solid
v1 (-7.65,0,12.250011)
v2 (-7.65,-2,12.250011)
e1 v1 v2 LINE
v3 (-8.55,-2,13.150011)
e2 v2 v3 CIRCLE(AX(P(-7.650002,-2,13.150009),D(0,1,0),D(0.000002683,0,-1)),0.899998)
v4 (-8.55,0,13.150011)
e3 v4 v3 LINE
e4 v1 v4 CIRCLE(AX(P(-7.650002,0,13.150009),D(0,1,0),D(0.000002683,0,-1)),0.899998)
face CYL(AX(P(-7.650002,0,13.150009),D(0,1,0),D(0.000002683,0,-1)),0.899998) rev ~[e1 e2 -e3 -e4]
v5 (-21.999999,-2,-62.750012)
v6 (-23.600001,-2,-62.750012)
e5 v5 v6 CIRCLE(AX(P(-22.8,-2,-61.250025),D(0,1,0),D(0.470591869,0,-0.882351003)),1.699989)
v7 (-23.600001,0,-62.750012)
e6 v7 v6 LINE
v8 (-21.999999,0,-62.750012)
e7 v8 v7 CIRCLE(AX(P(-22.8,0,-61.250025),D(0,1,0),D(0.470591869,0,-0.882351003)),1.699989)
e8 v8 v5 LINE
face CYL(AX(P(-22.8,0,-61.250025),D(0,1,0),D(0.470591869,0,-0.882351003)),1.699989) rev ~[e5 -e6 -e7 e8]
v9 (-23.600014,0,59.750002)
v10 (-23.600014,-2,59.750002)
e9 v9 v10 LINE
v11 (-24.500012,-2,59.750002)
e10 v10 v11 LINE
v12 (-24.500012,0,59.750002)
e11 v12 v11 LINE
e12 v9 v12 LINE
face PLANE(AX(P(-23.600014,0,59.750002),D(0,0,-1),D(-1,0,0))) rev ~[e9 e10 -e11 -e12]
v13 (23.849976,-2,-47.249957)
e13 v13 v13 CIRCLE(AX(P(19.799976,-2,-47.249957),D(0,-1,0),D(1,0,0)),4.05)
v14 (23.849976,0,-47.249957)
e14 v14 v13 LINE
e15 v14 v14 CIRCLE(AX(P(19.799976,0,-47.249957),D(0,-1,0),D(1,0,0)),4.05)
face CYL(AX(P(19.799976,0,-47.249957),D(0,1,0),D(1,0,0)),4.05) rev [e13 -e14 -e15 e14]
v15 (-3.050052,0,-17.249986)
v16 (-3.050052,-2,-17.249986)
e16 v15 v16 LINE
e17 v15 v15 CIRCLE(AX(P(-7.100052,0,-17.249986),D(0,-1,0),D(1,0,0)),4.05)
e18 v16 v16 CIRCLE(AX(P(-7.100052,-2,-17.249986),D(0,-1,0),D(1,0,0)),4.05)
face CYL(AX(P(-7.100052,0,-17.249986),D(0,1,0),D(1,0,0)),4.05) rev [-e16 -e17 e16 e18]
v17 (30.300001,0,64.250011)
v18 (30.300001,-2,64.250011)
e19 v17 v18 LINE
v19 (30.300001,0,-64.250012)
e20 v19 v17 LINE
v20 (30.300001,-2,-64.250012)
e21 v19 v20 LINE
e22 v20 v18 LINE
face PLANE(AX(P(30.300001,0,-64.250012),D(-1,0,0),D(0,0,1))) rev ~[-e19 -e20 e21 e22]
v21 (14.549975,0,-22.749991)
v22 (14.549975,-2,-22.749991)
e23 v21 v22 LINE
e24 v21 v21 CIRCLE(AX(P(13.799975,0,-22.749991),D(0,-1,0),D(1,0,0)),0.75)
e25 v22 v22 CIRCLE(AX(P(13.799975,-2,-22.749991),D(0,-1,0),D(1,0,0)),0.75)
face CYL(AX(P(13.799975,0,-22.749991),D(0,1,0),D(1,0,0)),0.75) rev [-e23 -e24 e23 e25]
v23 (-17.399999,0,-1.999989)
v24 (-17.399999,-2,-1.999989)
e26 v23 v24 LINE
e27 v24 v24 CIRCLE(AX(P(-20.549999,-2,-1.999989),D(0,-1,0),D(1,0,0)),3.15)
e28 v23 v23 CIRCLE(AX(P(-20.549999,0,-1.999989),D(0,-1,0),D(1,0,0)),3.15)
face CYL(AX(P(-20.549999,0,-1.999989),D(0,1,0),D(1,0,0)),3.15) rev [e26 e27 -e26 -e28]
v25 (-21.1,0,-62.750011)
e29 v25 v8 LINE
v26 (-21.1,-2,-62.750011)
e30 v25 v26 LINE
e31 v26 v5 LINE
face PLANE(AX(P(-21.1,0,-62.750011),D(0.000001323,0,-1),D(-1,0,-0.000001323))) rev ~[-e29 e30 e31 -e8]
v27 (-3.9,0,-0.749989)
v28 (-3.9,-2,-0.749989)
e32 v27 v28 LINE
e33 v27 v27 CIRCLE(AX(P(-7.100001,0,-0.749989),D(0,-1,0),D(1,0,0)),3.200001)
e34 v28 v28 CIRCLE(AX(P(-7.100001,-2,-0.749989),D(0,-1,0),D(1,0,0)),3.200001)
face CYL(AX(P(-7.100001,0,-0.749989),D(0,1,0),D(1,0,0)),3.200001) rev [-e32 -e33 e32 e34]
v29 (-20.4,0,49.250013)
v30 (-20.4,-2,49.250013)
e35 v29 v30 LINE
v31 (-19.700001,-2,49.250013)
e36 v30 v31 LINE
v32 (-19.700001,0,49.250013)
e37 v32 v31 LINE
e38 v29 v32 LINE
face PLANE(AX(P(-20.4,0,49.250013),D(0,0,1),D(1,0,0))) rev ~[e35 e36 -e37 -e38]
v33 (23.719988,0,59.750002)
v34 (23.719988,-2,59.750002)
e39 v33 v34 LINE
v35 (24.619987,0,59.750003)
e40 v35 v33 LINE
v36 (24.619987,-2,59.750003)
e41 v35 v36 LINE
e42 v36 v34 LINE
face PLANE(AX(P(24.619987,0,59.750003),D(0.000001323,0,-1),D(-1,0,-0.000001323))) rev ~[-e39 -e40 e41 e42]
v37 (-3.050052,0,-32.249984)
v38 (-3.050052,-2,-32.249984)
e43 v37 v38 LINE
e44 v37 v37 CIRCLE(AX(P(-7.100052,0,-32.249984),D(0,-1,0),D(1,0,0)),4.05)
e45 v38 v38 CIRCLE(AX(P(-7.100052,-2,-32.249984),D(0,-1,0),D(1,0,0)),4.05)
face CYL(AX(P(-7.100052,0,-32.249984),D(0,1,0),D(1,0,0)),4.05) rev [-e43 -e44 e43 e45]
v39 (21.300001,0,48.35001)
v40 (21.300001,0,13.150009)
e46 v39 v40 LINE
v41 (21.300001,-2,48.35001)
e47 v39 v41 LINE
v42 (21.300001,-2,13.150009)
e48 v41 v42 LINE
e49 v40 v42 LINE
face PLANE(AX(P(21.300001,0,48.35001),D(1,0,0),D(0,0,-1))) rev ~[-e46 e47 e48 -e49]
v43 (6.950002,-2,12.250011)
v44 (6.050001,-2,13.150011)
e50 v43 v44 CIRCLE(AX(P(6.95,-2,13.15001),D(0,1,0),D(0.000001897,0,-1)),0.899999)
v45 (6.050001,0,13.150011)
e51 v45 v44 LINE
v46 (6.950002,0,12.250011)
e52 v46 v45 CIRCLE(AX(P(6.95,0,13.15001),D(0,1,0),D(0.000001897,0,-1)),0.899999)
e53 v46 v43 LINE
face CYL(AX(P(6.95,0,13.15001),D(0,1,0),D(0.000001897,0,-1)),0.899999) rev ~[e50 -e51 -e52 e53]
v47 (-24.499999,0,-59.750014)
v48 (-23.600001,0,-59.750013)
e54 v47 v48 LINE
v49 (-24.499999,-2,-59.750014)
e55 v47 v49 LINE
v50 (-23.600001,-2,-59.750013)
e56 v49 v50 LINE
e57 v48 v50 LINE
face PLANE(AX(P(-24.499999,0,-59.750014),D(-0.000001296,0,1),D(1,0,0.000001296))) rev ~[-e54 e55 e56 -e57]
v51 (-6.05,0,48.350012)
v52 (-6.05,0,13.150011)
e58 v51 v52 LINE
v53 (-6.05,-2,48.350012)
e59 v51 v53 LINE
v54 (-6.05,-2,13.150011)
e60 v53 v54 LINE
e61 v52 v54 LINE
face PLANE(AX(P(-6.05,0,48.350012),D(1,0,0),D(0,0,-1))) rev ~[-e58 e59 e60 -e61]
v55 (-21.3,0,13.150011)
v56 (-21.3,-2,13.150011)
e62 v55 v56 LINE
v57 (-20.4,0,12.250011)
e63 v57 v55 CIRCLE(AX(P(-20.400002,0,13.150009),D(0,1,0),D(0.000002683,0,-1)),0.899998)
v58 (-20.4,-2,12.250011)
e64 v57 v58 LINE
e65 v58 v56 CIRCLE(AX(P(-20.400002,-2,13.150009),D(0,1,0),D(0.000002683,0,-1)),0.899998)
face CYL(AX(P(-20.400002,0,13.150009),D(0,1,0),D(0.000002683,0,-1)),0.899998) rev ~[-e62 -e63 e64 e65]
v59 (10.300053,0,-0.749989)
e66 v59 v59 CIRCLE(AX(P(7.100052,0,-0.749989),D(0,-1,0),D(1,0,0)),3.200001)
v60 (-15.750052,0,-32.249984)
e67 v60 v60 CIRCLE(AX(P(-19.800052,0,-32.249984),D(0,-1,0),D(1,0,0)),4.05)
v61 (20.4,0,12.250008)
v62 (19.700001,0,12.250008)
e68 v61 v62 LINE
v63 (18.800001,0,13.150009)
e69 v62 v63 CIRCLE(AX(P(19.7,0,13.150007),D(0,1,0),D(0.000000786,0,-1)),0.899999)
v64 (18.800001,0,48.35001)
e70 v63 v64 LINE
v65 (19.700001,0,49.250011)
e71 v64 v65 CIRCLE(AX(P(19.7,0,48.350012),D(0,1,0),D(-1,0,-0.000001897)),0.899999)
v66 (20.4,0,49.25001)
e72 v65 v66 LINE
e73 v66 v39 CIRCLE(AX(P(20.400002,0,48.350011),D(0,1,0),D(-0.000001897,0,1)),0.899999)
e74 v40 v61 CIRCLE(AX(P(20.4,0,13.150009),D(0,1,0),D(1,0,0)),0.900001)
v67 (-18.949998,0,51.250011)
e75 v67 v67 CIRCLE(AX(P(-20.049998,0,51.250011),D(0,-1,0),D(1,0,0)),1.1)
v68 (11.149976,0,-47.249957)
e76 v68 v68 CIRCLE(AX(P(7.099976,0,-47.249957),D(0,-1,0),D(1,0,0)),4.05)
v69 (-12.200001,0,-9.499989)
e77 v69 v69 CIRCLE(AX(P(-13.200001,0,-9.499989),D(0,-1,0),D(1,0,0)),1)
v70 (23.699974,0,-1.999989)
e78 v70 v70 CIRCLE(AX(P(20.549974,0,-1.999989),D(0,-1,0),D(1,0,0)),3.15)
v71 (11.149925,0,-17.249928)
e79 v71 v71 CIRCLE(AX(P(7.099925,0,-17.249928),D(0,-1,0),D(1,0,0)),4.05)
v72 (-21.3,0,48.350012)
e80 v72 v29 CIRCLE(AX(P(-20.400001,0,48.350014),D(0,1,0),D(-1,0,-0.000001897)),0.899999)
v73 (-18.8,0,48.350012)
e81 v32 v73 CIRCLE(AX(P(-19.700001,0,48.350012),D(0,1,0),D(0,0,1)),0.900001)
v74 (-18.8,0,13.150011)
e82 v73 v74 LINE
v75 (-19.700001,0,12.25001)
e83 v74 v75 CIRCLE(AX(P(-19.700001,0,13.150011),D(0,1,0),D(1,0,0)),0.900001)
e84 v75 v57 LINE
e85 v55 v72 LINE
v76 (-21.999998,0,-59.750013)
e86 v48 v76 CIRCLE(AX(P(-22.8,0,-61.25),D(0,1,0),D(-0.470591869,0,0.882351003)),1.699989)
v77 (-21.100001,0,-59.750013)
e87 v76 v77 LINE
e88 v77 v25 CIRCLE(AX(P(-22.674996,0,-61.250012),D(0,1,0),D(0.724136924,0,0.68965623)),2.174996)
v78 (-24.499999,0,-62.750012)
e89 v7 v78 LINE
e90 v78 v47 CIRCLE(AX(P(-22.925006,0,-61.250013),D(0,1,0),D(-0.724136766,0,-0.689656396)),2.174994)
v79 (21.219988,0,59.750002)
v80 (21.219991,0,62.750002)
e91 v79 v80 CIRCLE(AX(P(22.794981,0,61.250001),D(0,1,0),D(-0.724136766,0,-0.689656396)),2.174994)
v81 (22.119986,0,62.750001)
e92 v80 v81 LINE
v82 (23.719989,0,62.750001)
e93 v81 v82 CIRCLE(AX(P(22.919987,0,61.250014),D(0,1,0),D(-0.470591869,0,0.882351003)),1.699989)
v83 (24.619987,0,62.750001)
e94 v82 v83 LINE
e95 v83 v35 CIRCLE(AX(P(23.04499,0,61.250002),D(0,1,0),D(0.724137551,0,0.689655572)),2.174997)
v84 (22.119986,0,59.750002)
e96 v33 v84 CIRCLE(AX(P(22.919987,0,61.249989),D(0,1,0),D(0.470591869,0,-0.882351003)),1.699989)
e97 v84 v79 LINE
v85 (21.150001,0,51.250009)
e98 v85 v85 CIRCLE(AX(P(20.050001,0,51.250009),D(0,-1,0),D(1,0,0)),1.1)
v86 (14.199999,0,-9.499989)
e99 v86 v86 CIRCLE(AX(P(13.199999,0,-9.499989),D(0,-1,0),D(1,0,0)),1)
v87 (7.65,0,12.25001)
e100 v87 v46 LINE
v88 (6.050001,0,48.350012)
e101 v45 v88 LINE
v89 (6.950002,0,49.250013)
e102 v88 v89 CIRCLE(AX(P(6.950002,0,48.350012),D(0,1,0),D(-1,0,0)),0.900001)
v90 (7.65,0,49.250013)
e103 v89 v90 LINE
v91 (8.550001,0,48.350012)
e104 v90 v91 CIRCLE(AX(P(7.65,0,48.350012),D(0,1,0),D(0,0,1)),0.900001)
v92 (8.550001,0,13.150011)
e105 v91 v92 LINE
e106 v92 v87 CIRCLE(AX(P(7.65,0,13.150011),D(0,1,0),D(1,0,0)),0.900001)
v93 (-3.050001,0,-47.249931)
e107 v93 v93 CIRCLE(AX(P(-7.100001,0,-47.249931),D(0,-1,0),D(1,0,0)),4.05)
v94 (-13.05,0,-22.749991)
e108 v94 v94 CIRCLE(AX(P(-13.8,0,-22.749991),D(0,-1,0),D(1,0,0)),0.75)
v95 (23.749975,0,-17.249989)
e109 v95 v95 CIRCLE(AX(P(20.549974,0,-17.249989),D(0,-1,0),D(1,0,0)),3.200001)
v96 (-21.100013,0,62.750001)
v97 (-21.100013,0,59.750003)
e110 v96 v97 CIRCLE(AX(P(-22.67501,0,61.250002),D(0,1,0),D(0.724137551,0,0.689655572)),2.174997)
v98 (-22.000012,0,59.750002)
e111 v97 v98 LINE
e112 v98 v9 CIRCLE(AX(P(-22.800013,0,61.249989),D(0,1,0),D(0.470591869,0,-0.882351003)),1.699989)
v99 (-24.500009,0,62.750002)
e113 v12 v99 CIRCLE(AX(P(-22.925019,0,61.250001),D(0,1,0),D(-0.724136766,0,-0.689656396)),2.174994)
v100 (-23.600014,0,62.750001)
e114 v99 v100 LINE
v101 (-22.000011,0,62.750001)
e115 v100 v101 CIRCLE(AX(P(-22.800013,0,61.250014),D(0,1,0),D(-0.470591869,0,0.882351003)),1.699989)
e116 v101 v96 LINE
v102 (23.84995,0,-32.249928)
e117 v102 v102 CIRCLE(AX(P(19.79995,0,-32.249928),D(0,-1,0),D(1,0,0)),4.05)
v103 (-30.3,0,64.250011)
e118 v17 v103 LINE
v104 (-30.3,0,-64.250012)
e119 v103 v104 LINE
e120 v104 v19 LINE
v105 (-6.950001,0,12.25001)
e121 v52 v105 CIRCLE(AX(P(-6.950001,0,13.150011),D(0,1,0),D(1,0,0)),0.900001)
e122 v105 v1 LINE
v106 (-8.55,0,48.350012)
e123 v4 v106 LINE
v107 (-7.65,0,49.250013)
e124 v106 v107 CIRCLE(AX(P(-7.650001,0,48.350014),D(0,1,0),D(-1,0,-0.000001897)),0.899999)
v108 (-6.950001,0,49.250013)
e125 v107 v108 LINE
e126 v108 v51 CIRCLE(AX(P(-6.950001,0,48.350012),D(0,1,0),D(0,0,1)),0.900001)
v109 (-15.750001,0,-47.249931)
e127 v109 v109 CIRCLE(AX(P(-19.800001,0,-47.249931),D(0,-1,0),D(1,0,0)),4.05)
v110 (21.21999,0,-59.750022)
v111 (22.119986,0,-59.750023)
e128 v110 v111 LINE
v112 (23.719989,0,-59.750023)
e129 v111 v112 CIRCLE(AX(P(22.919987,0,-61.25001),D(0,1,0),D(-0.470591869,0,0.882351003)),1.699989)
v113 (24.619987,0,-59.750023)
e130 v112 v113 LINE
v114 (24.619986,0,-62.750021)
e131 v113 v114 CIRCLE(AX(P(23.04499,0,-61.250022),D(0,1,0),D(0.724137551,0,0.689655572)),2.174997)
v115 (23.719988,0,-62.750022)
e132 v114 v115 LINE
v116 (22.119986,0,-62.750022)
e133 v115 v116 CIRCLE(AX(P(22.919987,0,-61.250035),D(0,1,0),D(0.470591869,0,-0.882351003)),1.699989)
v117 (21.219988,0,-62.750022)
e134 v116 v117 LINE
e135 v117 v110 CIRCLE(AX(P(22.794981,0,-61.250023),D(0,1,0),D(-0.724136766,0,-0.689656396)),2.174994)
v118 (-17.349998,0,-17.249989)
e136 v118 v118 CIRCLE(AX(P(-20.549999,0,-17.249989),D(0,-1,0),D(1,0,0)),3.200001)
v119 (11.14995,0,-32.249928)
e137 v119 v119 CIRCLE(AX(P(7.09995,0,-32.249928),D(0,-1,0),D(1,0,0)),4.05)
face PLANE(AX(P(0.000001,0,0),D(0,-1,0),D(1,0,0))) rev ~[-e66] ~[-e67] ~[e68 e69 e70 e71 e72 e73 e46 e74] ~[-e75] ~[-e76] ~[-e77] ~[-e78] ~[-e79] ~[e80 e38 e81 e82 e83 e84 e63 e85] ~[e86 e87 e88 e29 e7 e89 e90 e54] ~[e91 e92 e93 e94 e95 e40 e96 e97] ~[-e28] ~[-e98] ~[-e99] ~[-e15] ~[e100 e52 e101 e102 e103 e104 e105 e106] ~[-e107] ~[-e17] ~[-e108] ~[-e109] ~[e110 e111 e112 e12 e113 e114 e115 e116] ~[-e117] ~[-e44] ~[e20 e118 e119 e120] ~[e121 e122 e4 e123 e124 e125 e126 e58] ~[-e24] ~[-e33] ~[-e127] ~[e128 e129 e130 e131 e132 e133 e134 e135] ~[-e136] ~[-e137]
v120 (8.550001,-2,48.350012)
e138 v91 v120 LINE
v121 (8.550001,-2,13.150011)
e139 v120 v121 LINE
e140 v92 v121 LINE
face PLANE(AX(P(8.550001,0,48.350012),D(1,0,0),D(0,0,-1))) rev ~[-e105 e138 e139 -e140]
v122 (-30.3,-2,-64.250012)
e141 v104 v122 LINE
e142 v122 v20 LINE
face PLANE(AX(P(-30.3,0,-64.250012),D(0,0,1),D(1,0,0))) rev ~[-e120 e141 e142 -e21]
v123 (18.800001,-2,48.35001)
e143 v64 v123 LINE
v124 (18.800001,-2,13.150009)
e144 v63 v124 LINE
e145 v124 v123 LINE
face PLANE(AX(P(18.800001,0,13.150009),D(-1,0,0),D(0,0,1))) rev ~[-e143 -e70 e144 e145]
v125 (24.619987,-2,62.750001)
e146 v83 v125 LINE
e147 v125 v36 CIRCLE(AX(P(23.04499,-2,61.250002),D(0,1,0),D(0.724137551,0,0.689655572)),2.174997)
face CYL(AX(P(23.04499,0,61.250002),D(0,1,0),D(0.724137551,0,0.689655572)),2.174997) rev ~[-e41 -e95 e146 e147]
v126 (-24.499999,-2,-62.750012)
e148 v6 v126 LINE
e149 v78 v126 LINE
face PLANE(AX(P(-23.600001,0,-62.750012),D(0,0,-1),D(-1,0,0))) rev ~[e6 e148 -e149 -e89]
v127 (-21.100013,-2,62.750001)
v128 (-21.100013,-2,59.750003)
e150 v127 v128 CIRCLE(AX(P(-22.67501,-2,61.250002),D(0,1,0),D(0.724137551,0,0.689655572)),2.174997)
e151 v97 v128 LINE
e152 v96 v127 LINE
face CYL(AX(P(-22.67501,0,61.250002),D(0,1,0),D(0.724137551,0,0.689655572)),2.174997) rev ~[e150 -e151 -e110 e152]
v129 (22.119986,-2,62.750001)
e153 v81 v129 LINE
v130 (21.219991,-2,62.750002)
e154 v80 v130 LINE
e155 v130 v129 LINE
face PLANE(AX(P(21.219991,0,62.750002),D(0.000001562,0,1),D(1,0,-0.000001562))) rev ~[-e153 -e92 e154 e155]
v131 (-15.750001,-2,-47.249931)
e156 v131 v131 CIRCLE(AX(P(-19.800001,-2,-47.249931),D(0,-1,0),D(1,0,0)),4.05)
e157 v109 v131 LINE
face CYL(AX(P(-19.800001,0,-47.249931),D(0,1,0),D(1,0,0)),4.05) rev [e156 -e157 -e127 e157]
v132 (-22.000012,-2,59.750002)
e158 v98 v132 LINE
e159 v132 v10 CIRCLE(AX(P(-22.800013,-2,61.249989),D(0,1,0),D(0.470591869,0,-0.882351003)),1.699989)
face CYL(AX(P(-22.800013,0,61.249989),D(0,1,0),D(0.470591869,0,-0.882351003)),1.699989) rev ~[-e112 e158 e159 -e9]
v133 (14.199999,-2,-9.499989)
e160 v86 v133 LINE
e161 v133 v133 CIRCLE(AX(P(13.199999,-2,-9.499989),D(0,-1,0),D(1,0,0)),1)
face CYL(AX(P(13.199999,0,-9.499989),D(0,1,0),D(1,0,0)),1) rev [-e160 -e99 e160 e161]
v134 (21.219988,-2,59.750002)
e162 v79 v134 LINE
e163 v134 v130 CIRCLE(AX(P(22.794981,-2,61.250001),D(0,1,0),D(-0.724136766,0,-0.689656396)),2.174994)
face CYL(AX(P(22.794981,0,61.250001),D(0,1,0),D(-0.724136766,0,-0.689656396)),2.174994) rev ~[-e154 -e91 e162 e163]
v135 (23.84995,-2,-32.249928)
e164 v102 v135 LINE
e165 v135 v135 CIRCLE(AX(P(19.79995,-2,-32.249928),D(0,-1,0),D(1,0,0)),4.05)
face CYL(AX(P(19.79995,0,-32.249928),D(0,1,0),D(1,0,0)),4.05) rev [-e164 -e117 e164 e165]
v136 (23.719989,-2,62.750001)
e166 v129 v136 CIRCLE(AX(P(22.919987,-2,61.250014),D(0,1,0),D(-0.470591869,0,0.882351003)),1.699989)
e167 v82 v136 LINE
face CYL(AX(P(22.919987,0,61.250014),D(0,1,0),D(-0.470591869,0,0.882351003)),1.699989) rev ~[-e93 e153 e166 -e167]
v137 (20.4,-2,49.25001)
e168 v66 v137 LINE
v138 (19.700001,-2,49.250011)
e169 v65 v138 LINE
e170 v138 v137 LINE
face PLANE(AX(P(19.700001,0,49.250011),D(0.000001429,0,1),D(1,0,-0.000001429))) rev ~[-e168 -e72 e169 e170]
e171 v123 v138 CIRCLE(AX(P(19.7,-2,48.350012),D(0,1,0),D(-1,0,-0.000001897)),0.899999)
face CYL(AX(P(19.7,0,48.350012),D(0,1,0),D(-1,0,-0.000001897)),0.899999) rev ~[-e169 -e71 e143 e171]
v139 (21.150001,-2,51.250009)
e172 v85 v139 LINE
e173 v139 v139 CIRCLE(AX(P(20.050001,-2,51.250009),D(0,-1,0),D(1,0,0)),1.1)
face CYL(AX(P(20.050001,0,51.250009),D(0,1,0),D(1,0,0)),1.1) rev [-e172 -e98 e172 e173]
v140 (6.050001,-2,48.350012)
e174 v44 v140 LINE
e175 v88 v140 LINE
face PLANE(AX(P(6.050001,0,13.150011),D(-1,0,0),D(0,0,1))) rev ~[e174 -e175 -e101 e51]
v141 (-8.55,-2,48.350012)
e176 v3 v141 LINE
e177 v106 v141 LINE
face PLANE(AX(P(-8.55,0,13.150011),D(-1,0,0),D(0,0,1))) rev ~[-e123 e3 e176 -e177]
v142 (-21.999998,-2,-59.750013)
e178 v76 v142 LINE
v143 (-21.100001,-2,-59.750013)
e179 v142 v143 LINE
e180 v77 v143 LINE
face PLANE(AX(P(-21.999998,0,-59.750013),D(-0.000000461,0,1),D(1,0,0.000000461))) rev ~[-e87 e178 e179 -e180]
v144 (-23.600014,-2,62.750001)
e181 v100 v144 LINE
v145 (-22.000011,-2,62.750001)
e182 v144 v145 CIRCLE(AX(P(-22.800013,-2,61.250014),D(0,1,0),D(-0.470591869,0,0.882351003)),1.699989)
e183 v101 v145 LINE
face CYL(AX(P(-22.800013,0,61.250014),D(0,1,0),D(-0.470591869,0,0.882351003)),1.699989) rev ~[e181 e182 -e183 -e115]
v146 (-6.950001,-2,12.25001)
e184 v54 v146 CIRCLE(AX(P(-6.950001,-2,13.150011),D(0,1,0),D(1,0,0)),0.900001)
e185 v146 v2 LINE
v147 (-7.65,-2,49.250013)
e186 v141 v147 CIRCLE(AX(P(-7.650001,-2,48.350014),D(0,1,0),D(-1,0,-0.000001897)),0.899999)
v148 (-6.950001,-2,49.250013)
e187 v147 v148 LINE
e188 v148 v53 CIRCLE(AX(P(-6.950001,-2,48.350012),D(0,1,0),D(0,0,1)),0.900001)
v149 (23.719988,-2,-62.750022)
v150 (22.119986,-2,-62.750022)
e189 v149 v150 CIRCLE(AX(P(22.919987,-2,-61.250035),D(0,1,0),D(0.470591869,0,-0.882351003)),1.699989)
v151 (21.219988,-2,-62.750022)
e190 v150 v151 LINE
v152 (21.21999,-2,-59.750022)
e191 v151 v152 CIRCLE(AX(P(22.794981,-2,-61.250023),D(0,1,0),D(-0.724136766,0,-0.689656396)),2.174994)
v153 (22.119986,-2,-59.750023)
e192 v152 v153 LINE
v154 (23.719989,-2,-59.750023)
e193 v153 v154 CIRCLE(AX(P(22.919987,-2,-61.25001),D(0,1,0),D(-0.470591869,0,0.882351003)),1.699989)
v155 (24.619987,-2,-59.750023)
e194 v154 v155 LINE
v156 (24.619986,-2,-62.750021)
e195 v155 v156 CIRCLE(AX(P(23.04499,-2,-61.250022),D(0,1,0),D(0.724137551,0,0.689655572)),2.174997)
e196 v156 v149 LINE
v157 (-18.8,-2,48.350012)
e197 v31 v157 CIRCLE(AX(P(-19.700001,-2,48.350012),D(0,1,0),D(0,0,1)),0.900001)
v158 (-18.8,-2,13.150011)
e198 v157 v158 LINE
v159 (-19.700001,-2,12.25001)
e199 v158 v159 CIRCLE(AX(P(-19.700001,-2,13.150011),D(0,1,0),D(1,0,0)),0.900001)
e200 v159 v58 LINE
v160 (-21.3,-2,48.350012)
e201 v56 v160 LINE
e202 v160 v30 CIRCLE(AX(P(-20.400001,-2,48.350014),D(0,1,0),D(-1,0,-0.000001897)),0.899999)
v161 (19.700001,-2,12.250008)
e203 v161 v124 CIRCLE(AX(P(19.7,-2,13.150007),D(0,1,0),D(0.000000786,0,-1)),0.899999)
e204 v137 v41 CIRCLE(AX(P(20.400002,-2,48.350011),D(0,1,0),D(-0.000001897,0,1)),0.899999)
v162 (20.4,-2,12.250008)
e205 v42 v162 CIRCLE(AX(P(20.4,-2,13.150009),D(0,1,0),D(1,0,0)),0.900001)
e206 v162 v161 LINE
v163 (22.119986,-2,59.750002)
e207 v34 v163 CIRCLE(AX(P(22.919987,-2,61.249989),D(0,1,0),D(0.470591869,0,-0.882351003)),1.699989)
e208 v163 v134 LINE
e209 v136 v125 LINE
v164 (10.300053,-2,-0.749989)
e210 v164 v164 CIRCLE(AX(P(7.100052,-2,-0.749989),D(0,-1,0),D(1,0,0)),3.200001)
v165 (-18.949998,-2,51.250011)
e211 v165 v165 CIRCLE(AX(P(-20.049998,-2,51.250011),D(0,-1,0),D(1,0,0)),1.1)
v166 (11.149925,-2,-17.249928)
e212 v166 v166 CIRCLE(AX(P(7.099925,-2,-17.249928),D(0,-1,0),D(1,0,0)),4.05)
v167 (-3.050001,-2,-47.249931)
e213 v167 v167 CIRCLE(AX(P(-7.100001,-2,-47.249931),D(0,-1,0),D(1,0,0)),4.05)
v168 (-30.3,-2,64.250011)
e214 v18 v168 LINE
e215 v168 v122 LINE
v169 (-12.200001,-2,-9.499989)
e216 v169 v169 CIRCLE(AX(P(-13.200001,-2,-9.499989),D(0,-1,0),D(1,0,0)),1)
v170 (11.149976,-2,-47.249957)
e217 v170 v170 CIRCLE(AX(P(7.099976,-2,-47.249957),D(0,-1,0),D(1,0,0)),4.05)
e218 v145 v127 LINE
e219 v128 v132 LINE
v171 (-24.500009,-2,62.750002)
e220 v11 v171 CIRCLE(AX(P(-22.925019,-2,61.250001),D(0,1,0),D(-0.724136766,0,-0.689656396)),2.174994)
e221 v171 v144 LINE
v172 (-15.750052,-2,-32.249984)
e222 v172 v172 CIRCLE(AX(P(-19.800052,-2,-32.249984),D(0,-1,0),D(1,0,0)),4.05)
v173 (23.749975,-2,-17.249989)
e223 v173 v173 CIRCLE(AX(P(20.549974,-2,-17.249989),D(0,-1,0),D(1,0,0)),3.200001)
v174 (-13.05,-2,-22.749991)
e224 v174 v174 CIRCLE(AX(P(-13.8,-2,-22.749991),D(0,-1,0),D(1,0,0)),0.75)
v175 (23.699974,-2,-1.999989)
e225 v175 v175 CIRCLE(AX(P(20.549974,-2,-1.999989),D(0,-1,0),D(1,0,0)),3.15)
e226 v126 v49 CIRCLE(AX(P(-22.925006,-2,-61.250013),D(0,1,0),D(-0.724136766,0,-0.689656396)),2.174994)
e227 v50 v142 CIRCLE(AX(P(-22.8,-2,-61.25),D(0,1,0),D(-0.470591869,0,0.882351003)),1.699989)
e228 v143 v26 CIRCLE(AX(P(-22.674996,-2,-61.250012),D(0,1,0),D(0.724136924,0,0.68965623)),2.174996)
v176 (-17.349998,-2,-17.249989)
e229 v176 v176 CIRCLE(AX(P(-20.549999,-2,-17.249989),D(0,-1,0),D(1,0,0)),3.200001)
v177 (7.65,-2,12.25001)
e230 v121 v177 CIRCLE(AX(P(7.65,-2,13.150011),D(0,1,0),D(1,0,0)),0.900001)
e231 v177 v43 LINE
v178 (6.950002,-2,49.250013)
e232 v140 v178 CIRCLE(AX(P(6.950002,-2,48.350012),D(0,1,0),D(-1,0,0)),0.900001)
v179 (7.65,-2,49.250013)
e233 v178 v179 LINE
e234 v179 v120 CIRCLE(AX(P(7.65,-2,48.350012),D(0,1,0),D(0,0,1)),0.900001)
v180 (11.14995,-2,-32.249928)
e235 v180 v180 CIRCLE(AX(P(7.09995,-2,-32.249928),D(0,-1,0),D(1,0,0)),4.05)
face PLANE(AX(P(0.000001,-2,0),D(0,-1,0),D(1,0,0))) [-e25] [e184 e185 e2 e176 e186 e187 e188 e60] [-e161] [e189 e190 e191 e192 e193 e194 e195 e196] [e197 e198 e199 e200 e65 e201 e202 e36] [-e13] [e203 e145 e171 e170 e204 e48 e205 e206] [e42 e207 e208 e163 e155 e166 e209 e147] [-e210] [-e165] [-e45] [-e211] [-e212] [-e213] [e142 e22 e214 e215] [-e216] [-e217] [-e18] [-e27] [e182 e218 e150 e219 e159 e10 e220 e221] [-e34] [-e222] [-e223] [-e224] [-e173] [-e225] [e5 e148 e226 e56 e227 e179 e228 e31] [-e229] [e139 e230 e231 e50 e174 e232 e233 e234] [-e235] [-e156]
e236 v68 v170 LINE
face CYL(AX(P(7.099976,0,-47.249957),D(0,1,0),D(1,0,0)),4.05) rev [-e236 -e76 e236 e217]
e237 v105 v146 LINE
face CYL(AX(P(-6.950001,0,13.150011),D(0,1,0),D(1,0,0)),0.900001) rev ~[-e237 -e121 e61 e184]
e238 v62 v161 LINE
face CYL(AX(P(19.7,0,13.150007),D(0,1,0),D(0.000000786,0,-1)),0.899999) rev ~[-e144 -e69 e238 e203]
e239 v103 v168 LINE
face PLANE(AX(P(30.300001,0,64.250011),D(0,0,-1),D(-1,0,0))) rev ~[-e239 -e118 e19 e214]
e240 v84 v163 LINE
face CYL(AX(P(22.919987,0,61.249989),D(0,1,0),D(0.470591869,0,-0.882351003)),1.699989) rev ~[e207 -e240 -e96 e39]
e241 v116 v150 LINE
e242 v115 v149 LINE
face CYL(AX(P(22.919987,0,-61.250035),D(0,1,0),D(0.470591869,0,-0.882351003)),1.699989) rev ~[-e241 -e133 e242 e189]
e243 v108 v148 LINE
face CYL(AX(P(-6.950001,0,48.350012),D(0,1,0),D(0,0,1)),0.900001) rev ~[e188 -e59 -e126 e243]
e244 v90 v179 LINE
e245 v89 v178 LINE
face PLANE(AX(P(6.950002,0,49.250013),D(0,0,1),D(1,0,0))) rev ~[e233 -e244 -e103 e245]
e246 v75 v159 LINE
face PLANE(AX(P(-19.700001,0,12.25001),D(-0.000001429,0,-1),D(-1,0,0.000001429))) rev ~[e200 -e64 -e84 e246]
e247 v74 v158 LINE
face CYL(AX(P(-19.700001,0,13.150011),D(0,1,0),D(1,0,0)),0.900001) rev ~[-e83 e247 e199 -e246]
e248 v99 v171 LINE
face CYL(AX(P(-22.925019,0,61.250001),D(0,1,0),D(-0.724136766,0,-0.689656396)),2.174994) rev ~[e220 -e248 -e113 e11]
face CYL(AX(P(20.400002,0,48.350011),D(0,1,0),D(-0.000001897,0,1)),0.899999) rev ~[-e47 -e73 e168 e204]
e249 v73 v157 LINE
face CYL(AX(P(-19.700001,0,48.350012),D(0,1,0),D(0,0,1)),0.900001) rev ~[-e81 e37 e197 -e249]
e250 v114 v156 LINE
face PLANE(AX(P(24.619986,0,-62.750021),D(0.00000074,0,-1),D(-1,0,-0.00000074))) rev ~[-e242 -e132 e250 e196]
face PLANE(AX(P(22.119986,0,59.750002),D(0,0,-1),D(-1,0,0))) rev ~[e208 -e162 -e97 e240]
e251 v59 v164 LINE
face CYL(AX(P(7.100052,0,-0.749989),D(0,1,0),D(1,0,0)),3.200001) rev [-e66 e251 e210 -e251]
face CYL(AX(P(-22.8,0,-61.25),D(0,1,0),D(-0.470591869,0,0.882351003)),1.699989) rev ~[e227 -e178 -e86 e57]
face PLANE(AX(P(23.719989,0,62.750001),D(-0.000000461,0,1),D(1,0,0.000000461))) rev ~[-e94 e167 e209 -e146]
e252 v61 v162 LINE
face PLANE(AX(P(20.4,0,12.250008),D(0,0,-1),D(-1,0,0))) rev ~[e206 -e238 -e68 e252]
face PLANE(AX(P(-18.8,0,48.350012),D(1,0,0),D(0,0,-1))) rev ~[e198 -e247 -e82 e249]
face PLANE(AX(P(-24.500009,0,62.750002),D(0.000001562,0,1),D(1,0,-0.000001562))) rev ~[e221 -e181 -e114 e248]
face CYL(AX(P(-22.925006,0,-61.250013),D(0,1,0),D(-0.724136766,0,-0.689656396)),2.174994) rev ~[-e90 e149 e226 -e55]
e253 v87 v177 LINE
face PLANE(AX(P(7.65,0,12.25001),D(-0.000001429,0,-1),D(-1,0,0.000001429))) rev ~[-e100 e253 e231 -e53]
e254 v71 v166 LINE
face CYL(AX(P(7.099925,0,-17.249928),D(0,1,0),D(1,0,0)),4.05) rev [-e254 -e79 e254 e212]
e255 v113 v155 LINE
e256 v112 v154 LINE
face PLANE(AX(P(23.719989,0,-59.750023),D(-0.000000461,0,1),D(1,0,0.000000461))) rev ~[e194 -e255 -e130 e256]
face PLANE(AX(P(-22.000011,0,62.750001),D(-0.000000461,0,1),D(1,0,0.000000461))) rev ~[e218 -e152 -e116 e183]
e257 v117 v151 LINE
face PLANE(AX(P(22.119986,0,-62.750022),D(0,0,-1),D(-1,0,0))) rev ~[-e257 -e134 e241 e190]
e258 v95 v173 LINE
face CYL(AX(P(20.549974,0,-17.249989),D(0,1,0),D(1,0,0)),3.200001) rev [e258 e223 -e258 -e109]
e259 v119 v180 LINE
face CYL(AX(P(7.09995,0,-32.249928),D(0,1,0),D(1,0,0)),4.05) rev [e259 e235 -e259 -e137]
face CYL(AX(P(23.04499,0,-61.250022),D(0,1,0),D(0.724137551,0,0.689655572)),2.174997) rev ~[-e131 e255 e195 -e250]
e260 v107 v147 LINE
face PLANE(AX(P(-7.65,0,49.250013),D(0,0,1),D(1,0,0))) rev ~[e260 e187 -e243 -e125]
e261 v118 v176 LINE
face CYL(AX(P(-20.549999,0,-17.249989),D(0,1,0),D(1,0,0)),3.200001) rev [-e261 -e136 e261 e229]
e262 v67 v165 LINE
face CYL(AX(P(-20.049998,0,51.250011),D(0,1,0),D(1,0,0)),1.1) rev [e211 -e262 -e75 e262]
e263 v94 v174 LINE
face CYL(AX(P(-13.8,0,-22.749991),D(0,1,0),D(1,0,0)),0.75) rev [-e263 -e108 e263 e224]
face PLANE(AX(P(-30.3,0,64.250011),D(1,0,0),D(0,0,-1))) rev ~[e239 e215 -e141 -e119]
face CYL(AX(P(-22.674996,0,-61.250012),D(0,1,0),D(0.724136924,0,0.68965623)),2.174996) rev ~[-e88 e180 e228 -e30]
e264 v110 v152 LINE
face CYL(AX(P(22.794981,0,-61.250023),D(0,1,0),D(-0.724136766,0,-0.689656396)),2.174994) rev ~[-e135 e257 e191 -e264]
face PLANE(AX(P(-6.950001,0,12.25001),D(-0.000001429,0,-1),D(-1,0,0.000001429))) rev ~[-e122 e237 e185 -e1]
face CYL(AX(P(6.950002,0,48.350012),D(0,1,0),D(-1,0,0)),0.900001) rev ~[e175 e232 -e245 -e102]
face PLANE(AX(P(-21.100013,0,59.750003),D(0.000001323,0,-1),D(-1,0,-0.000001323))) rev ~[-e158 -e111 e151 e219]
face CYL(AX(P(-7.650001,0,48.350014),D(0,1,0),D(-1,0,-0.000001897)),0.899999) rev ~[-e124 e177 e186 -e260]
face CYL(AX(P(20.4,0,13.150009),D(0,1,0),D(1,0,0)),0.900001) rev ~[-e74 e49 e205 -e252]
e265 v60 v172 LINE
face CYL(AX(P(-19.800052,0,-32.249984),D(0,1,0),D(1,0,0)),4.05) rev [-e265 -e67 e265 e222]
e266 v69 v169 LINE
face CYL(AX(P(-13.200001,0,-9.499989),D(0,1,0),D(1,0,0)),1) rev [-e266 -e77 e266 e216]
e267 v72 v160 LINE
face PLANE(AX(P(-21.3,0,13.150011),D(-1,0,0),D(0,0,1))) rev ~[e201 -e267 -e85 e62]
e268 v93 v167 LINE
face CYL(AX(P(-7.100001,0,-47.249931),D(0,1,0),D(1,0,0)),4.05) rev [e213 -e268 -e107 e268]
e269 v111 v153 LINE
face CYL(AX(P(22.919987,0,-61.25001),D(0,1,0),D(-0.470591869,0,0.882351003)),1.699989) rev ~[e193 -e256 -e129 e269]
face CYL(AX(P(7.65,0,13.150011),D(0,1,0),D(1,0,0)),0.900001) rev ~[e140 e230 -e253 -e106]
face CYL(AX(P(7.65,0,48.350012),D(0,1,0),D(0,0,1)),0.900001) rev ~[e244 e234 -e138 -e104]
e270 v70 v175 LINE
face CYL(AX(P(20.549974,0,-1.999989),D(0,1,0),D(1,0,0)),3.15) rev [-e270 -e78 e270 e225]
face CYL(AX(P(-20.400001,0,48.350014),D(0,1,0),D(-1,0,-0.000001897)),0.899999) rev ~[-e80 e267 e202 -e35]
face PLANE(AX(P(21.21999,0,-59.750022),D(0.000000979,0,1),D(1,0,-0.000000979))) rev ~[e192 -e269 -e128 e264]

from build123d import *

# Parameters (mm, degrees)
F0_R     = 4.05
F0_R_2   = 3.200001
F0_R_3   = 3.15
F0_R_4   = 0.75
F0_R_5   = 1
F0_R_6   = 1.1
F1_DEPTH = 2


# Not quite as in the source:
# - ends of sketch curves that miss each other by under 0.0002 mm in the source are joined


with BuildPart() as f1:
    # F0 (on Front) → F1 (new body)
    with BuildSketch(Plane.XZ):
        Polygon((-30.3, -61.250013), (-30.3, -64.250012), (30.300001, -64.250012), (30.300001, 64.250011), (-30.3, 64.250011), align=None)
        with BuildLine():
            ThreePointArc((-23.600001, -59.750013), (-22.7999995588, -59.550011), (-21.9999982215, -59.7500134152))
            Line((-21.9999982215, -59.7500134152), (-21.100001, -59.750013))
            ThreePointArc((-21.100001, -59.750013), (-20.5, -61.2500126379), (-21.1000001998, -62.7500108097))
            Line((-21.1000001998, -62.7500108097), (-21.999999, -62.750012))
            ThreePointArc((-21.999999, -62.750012), (-22.7999995588, -62.950014), (-23.600001, -62.750012))
            Line((-23.600001, -62.750012), (-24.499999, -62.750012))
            ThreePointArc((-24.499999, -62.750012), (-25.1, -61.2500126379), (-24.4999988252, -59.7500141665))
            Line((-24.4999988252, -59.7500141665), (-23.600001, -59.750013))
        make_face(mode=Mode.SUBTRACT)
        with Locations((-19.800001, -47.249931)):
            Circle(F0_R, mode=Mode.SUBTRACT)
        with Locations((-19.800052, -32.249984)):
            Circle(F0_R, mode=Mode.SUBTRACT)
        with Locations((-7.100001, -47.249931)):
            Circle(F0_R, mode=Mode.SUBTRACT)
        with Locations((-7.100052, -32.249984)):
            Circle(F0_R, mode=Mode.SUBTRACT)
        with Locations((-20.549999, -17.249989)):
            Circle(F0_R_2, mode=Mode.SUBTRACT)
        with Locations((-20.549999, -1.999989)):
            Circle(F0_R_3, mode=Mode.SUBTRACT)
        with Locations((-13.8, -22.749991)):
            Circle(F0_R_4, mode=Mode.SUBTRACT)
        with Locations((-7.100052, -17.249986)):
            Circle(F0_R, mode=Mode.SUBTRACT)
        with Locations((-13.200001, -9.499989)):
            Circle(F0_R_5, mode=Mode.SUBTRACT)
        with Locations((-7.100001, -0.749989)):
            Circle(F0_R_2, mode=Mode.SUBTRACT)
        with Locations((7.099976, -47.249957)):
            Circle(F0_R, mode=Mode.SUBTRACT)
        with Locations((7.09995, -32.249928)):
            Circle(F0_R, mode=Mode.SUBTRACT)
        with BuildLine():
            ThreePointArc((22.119986, -59.750023), (22.9199874412, -59.550021), (23.7199887785, -59.7500234152))
            Line((23.7199887785, -59.7500234152), (24.619987, -59.750023))
            ThreePointArc((24.619987, -59.750023), (25.219987, -61.250023), (24.6199863008, -62.7500213341))
            Line((24.6199863008, -62.7500213341), (23.719988, -62.750022))
            ThreePointArc((23.719988, -62.750022), (22.9199874412, -62.950024), (22.119986, -62.750022))
            Line((22.119986, -62.750022), (21.219988, -62.750022))
            ThreePointArc((21.219988, -62.750022), (20.619987, -61.250023), (21.2199901249, -59.7500221189))
            Line((21.2199901249, -59.7500221189), (22.119986, -59.750023))
        make_face(mode=Mode.SUBTRACT)
        with Locations((19.799976, -47.249957)):
            Circle(F0_R, mode=Mode.SUBTRACT)
        with Locations((19.79995, -32.249928)):
            Circle(F0_R, mode=Mode.SUBTRACT)
        with Locations((7.099925, -17.249928)):
            Circle(F0_R, mode=Mode.SUBTRACT)
        with Locations((13.799975, -22.749991)):
            Circle(F0_R_4, mode=Mode.SUBTRACT)
        with Locations((7.100052, -0.749989)):
            Circle(F0_R_2, mode=Mode.SUBTRACT)
        with Locations((13.199999, -9.499989)):
            Circle(F0_R_5, mode=Mode.SUBTRACT)
        with Locations((20.549974, -17.249989)):
            Circle(F0_R_2, mode=Mode.SUBTRACT)
        with Locations((20.549974, -1.999989)):
            Circle(F0_R_3, mode=Mode.SUBTRACT)
        with BuildLine():
            Line((-21.3, 13.150011), (-21.3, 30.750012))
            Line((-21.3, 30.750012), (-21.3, 48.350012))
            ThreePointArc((-21.3, 48.350012), (-21.0363968102, 48.9864088102), (-20.4, 49.250013))
            Line((-20.4, 49.250013), (-19.700001, 49.250013))
            ThreePointArc((-19.700001, 49.250013), (-19.0636041898, 48.9864088102), (-18.8, 48.350012))
            Line((-18.8, 48.350012), (-18.8, 30.750012))
            Line((-18.8, 30.750012), (-18.8, 13.150011))
            ThreePointArc((-18.8, 13.150011), (-19.0636041898, 12.5136141898), (-19.700001, 12.25001))
            Line((-19.700001, 12.25001), (-20.4, 12.250011))
            ThreePointArc((-20.4, 12.250011), (-21.0363968102, 12.5136141898), (-21.3, 13.150011))
        make_face(mode=Mode.SUBTRACT)
        with BuildLine():
            Line((-8.55, 13.150011), (-8.55, 30.750012))
            Line((-8.55, 30.750012), (-8.55, 48.350012))
            ThreePointArc((-8.55, 48.350012), (-8.2863968102, 48.9864088102), (-7.65, 49.250013))
            Line((-7.65, 49.250013), (-6.950001, 49.250013))
            ThreePointArc((-6.950001, 49.250013), (-6.3136041898, 48.9864088102), (-6.05, 48.350012))
            Line((-6.05, 48.350012), (-6.05, 30.750012))
            Line((-6.05, 30.750012), (-6.05, 13.150011))
            ThreePointArc((-6.05, 13.150011), (-6.3136041898, 12.5136141898), (-6.950001, 12.25001))
            Line((-6.950001, 12.25001), (-7.65, 12.250011))
            ThreePointArc((-7.65, 12.250011), (-8.2863968102, 12.5136141898), (-8.55, 13.150011))
        make_face(mode=Mode.SUBTRACT)
        with BuildLine():
            ThreePointArc((-23.600014, 62.750001), (-22.8000125588, 62.950003), (-22.0000112215, 62.7500005848))
            Line((-22.0000112215, 62.7500005848), (-21.100013, 62.750001))
            ThreePointArc((-21.100013, 62.750001), (-20.500013, 61.2500013621), (-21.1000131998, 59.7500031903))
            Line((-21.1000131998, 59.7500031903), (-22.000012, 59.750002))
            ThreePointArc((-22.000012, 59.750002), (-22.8000125588, 59.55), (-23.600014, 59.750002))
            Line((-23.600014, 59.750002), (-24.500012, 59.750002))
            ThreePointArc((-24.500012, 59.750002), (-25.100013, 61.2500013621), (-24.5000093757, 62.7500024055))
            Line((-24.5000093757, 62.7500024055), (-23.600014, 62.750001))
        make_face(mode=Mode.SUBTRACT)
        with Locations((-20.049998, 51.250011)):
            Circle(F0_R_6, mode=Mode.SUBTRACT)
        with BuildLine():
            Line((6.050001, 13.150011), (6.050001, 30.750012))
            Line((6.050001, 30.750012), (6.050001, 48.350012))
            ThreePointArc((6.050001, 48.350012), (6.3136051898, 48.9864088102), (6.950002, 49.250013))
            Line((6.950002, 49.250013), (7.65, 49.250013))
            ThreePointArc((7.65, 49.250013), (8.2863968102, 48.9864088102), (8.550001, 48.350012))
            Line((8.550001, 48.350012), (8.550001, 30.750012))
            Line((8.550001, 30.750012), (8.550001, 13.150011))
            ThreePointArc((8.550001, 13.150011), (8.2863968102, 12.5136141898), (7.65, 12.25001))
            Line((7.65, 12.25001), (6.950002, 12.250011))
            ThreePointArc((6.950002, 12.250011), (6.3136051898, 12.5136141898), (6.050001, 13.150011))
        make_face(mode=Mode.SUBTRACT)
        with BuildLine():
            Line((18.800001, 13.150009), (18.800001, 30.750009))
            Line((18.800001, 30.750009), (18.800001, 48.35001))
            ThreePointArc((18.800001, 48.35001), (19.0636041898, 48.9864068102), (19.700001, 49.250011))
            Line((19.700001, 49.250011), (20.4, 49.25001))
            ThreePointArc((20.4, 49.25001), (21.0363968102, 48.9864068102), (21.300001, 48.35001))
            Line((21.300001, 48.35001), (21.300001, 30.750009))
            Line((21.300001, 30.750009), (21.300001, 13.150009))
            ThreePointArc((21.300001, 13.150009), (21.0363968102, 12.5136121898), (20.4, 12.250008))
            Line((20.4, 12.250008), (19.700001, 12.250008))
            ThreePointArc((19.700001, 12.250008), (19.0636041898, 12.5136121898), (18.800001, 13.150009))
        make_face(mode=Mode.SUBTRACT)
        with Locations((20.050001, 51.250009)):
            Circle(F0_R_6, mode=Mode.SUBTRACT)
        with BuildLine():
            Line((22.119986, 59.750002), (21.219988, 59.750002))
            ThreePointArc((21.219988, 59.750002), (20.619987, 61.2500013621), (21.2199906243, 62.7500024055))
            Line((21.2199906243, 62.7500024055), (22.119986, 62.750001))
            ThreePointArc((22.119986, 62.750001), (22.9199874412, 62.950003), (23.7199887785, 62.7500005848))
            Line((23.7199887785, 62.7500005848), (24.619987, 62.750001))
            ThreePointArc((24.619987, 62.750001), (25.219987, 61.2500013621), (24.6199868002, 59.7500031903))
            Line((24.6199868002, 59.7500031903), (23.719988, 59.750002))
            ThreePointArc((23.719988, 59.750002), (22.9199874412, 59.55), (22.119986, 59.750002))
        make_face(mode=Mode.SUBTRACT)
    extrude(amount=F1_DEPTH)


solid = f1.part
